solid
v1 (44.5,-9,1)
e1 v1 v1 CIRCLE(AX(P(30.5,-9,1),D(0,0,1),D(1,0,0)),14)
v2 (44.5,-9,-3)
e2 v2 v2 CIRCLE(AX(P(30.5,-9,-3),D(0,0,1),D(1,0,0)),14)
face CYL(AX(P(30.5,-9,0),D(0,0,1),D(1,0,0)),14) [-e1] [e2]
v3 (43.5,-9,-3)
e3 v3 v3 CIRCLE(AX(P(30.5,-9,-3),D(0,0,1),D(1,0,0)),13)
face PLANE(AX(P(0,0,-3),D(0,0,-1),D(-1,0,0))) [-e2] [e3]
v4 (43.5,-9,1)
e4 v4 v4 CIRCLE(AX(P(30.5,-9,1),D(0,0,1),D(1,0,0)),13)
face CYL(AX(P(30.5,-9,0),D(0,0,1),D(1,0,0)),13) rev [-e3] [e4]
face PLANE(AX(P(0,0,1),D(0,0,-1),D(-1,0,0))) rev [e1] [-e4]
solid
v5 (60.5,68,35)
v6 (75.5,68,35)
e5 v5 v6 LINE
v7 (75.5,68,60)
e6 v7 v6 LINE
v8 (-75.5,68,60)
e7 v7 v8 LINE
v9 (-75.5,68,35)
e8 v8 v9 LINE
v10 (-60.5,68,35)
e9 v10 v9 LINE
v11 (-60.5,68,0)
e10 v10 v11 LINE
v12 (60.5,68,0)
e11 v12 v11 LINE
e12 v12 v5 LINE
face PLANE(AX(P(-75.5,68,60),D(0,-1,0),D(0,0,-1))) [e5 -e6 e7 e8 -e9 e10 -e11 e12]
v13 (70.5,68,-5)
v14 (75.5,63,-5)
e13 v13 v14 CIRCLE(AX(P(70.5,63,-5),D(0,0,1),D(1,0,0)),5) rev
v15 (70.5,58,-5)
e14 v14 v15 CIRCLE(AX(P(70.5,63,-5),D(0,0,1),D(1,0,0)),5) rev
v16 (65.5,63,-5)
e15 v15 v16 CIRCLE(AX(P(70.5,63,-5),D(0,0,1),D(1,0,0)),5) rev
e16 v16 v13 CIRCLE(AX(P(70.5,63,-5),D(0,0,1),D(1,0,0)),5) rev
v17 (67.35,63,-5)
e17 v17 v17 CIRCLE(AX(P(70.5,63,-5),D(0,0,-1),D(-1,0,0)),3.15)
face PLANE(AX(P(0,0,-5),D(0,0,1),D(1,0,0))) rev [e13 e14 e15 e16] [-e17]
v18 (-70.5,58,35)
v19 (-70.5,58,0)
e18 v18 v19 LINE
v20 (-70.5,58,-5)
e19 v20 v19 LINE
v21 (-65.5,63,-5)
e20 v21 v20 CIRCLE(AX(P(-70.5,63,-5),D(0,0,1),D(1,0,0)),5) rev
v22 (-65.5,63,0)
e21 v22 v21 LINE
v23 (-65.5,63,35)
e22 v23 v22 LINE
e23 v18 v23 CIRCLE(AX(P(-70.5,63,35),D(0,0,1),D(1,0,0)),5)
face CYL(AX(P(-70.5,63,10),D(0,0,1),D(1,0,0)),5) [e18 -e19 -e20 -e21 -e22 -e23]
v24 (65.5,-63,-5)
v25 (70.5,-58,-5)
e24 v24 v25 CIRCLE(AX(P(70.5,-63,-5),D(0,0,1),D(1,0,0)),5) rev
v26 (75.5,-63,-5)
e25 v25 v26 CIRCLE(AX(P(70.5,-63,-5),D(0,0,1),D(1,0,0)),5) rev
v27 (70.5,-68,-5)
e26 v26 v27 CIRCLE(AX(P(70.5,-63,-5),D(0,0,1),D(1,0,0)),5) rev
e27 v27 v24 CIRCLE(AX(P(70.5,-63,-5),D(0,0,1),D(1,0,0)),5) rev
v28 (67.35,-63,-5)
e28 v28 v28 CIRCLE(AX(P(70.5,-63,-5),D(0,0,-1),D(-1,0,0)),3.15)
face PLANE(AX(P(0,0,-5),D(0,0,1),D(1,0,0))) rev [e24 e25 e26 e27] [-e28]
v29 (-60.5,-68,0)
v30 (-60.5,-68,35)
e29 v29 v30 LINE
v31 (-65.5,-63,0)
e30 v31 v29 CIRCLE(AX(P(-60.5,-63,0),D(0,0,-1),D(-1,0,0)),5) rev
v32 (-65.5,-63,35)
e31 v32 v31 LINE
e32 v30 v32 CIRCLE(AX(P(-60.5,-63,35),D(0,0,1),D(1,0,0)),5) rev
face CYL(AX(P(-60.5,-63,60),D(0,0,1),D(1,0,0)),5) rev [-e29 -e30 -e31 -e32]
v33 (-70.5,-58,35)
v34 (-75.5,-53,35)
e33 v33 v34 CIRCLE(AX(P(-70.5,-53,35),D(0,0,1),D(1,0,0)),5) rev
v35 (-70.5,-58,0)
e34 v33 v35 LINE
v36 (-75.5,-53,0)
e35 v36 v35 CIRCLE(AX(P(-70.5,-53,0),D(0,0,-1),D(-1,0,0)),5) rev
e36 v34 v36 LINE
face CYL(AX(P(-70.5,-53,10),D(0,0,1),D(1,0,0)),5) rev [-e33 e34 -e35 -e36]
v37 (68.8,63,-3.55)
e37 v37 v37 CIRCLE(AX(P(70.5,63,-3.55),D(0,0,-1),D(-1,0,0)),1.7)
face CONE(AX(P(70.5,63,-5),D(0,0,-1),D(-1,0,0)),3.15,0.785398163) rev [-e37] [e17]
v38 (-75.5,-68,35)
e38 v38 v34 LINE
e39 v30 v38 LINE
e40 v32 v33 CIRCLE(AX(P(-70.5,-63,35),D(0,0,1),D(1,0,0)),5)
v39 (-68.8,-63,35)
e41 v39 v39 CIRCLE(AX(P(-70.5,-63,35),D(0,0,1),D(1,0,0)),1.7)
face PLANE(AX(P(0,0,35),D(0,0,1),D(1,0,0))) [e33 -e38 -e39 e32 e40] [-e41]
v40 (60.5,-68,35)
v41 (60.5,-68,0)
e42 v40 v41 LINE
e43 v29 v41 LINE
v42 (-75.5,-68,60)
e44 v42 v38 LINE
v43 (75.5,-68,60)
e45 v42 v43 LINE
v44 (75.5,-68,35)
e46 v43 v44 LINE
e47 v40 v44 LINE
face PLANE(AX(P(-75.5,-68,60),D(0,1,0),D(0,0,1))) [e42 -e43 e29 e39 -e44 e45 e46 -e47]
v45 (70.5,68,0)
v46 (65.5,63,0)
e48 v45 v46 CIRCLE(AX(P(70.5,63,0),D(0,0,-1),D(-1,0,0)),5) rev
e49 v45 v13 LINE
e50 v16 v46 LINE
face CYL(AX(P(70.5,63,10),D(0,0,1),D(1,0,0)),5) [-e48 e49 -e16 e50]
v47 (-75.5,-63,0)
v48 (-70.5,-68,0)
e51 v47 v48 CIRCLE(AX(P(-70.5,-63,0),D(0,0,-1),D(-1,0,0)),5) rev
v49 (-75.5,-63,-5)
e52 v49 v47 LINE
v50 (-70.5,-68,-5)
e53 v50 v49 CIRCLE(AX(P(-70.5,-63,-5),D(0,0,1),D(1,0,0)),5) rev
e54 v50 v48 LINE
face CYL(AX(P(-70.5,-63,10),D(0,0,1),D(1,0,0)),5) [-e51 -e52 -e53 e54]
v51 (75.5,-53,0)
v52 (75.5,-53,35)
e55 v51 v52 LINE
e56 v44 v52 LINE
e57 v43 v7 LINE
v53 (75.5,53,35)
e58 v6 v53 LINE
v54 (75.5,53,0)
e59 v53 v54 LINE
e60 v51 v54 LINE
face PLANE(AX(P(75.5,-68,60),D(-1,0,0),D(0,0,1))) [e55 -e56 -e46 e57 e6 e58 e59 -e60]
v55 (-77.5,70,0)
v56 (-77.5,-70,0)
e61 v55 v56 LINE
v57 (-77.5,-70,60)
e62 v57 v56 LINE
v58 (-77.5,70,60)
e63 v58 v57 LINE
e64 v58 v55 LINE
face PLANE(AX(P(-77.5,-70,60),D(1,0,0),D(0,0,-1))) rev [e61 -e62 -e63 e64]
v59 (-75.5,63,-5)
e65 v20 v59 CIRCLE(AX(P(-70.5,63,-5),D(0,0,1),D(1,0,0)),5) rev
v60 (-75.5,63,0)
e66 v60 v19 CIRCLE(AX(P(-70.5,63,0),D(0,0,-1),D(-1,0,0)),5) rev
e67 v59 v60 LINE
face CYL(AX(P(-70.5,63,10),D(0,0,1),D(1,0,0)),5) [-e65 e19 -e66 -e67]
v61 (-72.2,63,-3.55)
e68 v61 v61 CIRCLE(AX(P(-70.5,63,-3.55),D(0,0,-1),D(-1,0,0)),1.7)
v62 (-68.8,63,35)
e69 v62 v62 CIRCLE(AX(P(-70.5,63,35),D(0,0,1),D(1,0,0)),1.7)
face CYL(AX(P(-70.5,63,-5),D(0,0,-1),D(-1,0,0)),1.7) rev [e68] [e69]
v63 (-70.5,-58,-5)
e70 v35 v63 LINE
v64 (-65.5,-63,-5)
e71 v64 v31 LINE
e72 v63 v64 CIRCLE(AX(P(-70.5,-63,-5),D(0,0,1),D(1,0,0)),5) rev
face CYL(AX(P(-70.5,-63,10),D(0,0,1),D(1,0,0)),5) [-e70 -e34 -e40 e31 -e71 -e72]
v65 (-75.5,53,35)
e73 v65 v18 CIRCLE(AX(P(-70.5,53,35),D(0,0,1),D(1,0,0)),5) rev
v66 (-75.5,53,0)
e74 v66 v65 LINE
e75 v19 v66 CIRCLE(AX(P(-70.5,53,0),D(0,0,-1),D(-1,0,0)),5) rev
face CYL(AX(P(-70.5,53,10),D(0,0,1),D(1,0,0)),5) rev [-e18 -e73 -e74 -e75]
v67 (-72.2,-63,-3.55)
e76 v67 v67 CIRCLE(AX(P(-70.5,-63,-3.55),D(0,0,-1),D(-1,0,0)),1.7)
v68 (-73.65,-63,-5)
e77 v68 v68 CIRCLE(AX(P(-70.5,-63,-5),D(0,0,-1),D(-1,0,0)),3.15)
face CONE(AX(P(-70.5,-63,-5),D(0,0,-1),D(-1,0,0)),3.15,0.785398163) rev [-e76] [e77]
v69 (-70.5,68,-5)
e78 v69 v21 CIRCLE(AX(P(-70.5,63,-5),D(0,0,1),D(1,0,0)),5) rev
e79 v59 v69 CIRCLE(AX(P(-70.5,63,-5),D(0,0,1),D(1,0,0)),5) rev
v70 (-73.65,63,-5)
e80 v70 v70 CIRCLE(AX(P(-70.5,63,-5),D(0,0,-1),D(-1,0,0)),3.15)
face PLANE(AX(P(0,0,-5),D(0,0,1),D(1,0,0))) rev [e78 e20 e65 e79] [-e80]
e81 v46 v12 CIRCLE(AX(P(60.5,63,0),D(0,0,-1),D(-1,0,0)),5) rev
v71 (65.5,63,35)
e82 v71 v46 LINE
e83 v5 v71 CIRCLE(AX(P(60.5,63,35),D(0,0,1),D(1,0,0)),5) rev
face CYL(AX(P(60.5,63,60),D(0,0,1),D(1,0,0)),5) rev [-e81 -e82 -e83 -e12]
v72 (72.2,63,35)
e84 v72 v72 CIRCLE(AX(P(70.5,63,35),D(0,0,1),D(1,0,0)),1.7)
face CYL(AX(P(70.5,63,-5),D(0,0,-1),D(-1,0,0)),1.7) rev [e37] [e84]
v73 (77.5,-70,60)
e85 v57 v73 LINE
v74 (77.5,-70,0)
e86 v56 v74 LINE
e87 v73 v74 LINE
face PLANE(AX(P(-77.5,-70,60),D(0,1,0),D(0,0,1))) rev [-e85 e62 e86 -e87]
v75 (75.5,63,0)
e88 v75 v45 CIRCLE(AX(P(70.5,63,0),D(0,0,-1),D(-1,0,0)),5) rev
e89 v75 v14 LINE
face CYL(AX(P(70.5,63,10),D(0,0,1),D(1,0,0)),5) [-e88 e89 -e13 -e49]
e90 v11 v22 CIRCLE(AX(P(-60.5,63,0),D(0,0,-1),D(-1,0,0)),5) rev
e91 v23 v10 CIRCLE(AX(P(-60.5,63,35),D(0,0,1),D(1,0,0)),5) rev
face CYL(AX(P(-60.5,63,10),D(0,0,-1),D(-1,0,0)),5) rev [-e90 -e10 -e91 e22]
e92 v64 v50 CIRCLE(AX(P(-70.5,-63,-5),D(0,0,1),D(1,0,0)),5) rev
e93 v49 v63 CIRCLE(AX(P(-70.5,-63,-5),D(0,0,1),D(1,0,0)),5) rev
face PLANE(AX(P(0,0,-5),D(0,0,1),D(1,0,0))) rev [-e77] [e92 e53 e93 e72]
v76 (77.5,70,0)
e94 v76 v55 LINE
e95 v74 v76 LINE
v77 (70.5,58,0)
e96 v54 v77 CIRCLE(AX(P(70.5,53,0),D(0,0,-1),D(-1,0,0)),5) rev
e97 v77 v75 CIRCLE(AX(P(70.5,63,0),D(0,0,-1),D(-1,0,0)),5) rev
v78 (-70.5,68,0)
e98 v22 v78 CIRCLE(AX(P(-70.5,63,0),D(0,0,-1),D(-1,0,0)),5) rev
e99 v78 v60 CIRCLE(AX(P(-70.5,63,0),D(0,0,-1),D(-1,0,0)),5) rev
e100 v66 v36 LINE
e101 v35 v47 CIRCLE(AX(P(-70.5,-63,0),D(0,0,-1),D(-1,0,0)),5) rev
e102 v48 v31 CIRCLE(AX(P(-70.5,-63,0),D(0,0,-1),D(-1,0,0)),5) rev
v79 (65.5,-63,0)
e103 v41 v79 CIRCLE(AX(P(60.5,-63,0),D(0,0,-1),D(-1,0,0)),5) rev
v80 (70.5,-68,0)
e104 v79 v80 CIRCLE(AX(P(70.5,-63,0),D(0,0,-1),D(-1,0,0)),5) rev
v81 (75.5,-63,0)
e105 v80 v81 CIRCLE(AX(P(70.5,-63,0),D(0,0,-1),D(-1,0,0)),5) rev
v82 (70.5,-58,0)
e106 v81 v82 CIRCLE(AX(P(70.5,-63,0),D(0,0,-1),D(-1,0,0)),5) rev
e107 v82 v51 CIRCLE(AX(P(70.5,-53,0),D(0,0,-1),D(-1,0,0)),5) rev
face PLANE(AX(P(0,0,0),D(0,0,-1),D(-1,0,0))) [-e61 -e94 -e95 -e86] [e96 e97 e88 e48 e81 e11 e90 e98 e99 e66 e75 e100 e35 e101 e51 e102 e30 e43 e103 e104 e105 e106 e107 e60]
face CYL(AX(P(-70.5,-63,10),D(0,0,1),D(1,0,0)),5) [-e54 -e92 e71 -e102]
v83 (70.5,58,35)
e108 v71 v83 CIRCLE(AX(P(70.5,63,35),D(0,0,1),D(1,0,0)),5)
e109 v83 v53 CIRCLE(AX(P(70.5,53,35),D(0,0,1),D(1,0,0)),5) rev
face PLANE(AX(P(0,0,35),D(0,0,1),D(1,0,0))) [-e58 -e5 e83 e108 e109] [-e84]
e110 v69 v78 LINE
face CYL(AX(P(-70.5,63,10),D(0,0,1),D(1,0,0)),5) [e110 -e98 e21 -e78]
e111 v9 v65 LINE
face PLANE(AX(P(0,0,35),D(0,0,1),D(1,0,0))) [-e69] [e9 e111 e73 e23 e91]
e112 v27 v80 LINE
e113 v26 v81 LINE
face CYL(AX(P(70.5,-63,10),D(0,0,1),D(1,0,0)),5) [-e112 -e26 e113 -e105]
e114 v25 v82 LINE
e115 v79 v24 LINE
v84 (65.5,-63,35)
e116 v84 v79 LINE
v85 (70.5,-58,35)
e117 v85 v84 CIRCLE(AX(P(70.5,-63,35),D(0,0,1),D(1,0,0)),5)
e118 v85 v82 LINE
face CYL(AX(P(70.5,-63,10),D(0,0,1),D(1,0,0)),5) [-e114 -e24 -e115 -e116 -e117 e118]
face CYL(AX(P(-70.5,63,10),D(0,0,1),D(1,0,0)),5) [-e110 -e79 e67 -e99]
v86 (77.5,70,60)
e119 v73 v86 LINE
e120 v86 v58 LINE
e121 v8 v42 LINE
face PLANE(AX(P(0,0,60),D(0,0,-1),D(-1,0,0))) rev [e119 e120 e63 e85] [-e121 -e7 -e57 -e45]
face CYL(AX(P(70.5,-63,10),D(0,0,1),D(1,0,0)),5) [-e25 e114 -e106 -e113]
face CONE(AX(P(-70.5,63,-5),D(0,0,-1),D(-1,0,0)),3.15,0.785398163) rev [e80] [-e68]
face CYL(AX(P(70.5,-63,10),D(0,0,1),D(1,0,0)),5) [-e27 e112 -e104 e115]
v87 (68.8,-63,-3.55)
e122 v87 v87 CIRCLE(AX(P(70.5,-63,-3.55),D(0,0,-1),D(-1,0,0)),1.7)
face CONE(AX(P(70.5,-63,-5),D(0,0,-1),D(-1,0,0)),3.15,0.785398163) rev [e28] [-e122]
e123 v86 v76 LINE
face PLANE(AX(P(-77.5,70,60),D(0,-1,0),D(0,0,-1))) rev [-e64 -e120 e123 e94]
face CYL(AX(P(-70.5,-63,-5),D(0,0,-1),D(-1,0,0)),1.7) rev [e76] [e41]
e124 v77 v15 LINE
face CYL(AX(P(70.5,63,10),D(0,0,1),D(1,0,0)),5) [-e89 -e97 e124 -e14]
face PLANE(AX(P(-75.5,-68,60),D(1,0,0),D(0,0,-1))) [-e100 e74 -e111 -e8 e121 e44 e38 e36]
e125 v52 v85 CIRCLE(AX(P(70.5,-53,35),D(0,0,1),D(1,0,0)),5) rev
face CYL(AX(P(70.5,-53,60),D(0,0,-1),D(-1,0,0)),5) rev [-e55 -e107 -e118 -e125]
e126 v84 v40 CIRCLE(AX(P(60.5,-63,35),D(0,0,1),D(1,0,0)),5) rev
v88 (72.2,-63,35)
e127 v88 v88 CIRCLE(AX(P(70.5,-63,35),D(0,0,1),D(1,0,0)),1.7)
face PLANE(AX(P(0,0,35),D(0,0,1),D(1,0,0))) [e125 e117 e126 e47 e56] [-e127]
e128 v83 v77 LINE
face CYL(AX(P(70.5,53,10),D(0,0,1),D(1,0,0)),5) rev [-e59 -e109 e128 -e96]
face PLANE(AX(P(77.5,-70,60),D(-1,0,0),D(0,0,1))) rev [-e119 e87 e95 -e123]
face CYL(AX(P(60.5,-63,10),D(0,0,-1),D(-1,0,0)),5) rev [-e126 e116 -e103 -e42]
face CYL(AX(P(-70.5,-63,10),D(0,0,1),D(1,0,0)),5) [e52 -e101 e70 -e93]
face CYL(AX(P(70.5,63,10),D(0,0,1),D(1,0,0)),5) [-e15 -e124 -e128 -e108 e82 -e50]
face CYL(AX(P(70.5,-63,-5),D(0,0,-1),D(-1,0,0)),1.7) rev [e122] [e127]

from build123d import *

# Parameters (mm, degrees)
SKIZZE1_W                                      = 155
SKIZZE1_H                                      = 140
SKIZZE1_W_2                                    = 151
SKIZZE1_H_2                                    = 136
AUFSATZ_LINEAR_AUSTRAGEN2_DEPTH                = 60
AUFSATZ_LINEAR_START                           = -3
AUFSATZ_LINEAR_AUSTRAGEN6_OUTLINE_R            = 14
AUFSATZ_LINEAR_AUSTRAGEN6_OUTLINE_R_2          = 13
AUFSATZ_LINEAR_AUSTRAGEN6_DEPTH                = 4
AUFSATZ_LINEAR_AUSTRAGEN8_DEPTH                = 25
AUFSATZ_LINEAR_AUSTRAGEN8_DEPTH_BACK           = 15
VERRUNDUNG17_R                                 = 5
VERRUNDUNG18_R                                 = 5
FORMSENKUNG_F_R_M3_LINSENSENKSCHRAUBE1_A_COUNT = 2
FORMSENKUNG_F_R_M3_LINSENSENKSCHRAUBE1_A_PITCH = 126
FORMSENKUNG_F_R_M3_LINSENSENKSCHRAUB_2_COUNT   = 2
FORMSENKUNG_F_R_M3_LINSENSENKSCHRAUB_2_PITCH   = 189.0952141118331
FORMSENKUNG_F_R_M3_LINSENSENKSCHRAUB_3_COUNT   = 2
FORMSENKUNG_F_R_M3_LINSENSENKSCHRAUB_3_PITCH   = 141


# Read off the part's stored shape, not the designer's step: Aufsatz-Linear austragen6
with BuildPart() as part:
    # Skizze1 → Aufsatz-Linear austragen2 (new body)
    with BuildSketch(Plane.XY):
        Rectangle(SKIZZE1_W, SKIZZE1_H)
        Rectangle(SKIZZE1_W_2, SKIZZE1_H_2, mode=Mode.SUBTRACT)
    extrude(amount=AUFSATZ_LINEAR_AUSTRAGEN2_DEPTH)

    # 3D-Skizze1 → Aufsatz-Linear austragen8 (add, two sides: drawn at the far end of the back side and taken through both)
    with BuildSketch(Plane(origin=(-75.50000000000003, 67.99999999999999, 10.000000000000002), x_dir=(0.7430494130276538, -0.6692365574288803, 0), z_dir=(0, 0, 1)).offset(-AUFSATZ_LINEAR_AUSTRAGEN8_DEPTH_BACK)):
        Polygon((0, 0), (7.430494130276535, 6.6923655742888), (14.122859704565338, -0.7381285559877395), (6.692365574288805, -7.43049413027654), align=None)
        Polygon((112.20046136717572, 101.05472017176092), (104.7699672368992, 94.36235459747213), (111.462332811188, 86.9318604671956), (118.89282694146452, 93.62422604148439), align=None)
        Polygon((203.21663317750344, 0), (195.78613904722692, -6.692365574288789), (189.09377347293812, 0.7381285559877604), (196.52426760321464, 7.430494130276549), align=None)
        Polygon((91.01617181032773, -101.05472017176092), (98.44666594060426, -94.36235459747212), (91.75430036631546, -86.93186046719558), (84.32380623603892, -93.62422604148438), align=None)
    extrude(amount=AUFSATZ_LINEAR_AUSTRAGEN8_DEPTH + AUFSATZ_LINEAR_AUSTRAGEN8_DEPTH_BACK)

    # Verrundung17
    verrundung17_edges = [part.edges().sort_by_distance(p)[0] for p in [
        (75.49999999999994, 58, 17.5),
        (65.49999999999997, 58, 15.000000000000002),
        (65.49999999999997, 67.99999999999999, 17.5),
        (-65.50000000000003, 67.99999999999999, 17.5),
        (-65.50000000000003, 57.999999999999986, 15),
        (-75.50000000000003, 57.999999999999986, 17.5),
        (-75.50000000000003, -57.999999999999986, 17.5),
        (-65.50000000000003, -68.00000000000001, 17.5),
        (-65.50000000000003, -58, 15.000000000000002),
        (65.49999999999997, -68.00000000000001, 17.5),
        (75.49999999999994, -58, 17.5),
        (65.5, -58, 15),
    ]]
    fillet(verrundung17_edges, radius=VERRUNDUNG17_R - 0.0001)  # a hair under: the kernel refuses the full size

    # Verrundung18
    verrundung18_edges = [part.edges().sort_by_distance(p)[0] for p in [
        (65.49999999999997, 67.99999999999999, -2.499999999999999),
        (75.49999999999994, 67.99999999999999, -2.5),
        (75.49999999999994, 58, -2.5),
        (-75.50000000000003, -57.999999999999986, -2.5),
        (-65.50000000000003, 67.99999999999999, -2.5),
        (-75.50000000000003, 67.99999999999999, -2.499999999999999),
        (-75.50000000000003, 57.999999999999986, -2.499999999999999),
        (-75.50000000000001, -68.00000000000001, -2.5),
        (-65.50000000000003, -68.00000000000001, -2.499999999999999),
        (65.49999999999997, -68.00000000000001, -2.5),
        (75.49999999999994, -58, -2.499999999999999),
        (75.49999999999994, -68.00000000000001, -2.499999999999999),
    ]]
    fillet(verrundung18_edges, radius=VERRUNDUNG18_R - 0.0001)  # a hair under: the kernel refuses the full size

    # Skizze18 → Formsenkung für M3 Linsensenkschraube1 (revolve, cut)
    with BuildSketch(Plane(origin=(70.49999999999999, -63.000000000000014, -4.999999999999999), x_dir=(0, 1, 0), z_dir=(1, 0, 0))):
        Polygon((0, 0), (-9.8e-15, 40.00110307764064), (1.69999999999999, 40.00110307764064), (1.6999999999999953, 1.45), (3.15, 0), align=None)
    formsenkung_f_r_m3_linsensenkschraube1 = revolve(axis=Axis((70.49999999999999, -63.000000000000014, -11.34999999999999), (0, 0, 1)), mode=Mode.SUBTRACT)

    # Formsenkung für M3 Linsensenkschraube1 a: Formsenkung für M3 Linsensenkschraube1 ×2
    with Locations(*[(0, i * FORMSENKUNG_F_R_M3_LINSENSENKSCHRAUBE1_A_PITCH, 0) for i in range(1, FORMSENKUNG_F_R_M3_LINSENSENKSCHRAUBE1_A_COUNT)]):
        add(formsenkung_f_r_m3_linsensenkschraube1, mode=Mode.SUBTRACT)

    # Formsenkung f_r M3 Linsensenkschraub 2: Formsenkung für M3 Linsensenkschraube1 ×2
    with Locations(*[Vector(-0.7456561006171789, 0.666330983530245, 0) * (i * FORMSENKUNG_F_R_M3_LINSENSENKSCHRAUB_2_PITCH) for i in range(1, FORMSENKUNG_F_R_M3_LINSENSENKSCHRAUB_2_COUNT)]):
        add(formsenkung_f_r_m3_linsensenkschraube1, mode=Mode.SUBTRACT)

    # Formsenkung f_r M3 Linsensenkschraub 3: Formsenkung für M3 Linsensenkschraube1 ×2
    with Locations(*[(-i * FORMSENKUNG_F_R_M3_LINSENSENKSCHRAUB_3_PITCH, 0, 0) for i in range(1, FORMSENKUNG_F_R_M3_LINSENSENKSCHRAUB_3_COUNT)]):
        add(formsenkung_f_r_m3_linsensenkschraube1, mode=Mode.SUBTRACT)


with BuildPart() as body_2:
    # Aufsatz-Linear austragen6 outline → Aufsatz-Linear austragen6 (new body)
    with BuildSketch(Plane.XY.offset(AUFSATZ_LINEAR_START)):
        with Locations((30.5, -9)):
            Circle(AUFSATZ_LINEAR_AUSTRAGEN6_OUTLINE_R)
        with Locations((30.5, -9)):
            Circle(AUFSATZ_LINEAR_AUSTRAGEN6_OUTLINE_R_2, mode=Mode.SUBTRACT)
    extrude(amount=AUFSATZ_LINEAR_AUSTRAGEN6_DEPTH)


solid = Compound([part.part, body_2.part])
